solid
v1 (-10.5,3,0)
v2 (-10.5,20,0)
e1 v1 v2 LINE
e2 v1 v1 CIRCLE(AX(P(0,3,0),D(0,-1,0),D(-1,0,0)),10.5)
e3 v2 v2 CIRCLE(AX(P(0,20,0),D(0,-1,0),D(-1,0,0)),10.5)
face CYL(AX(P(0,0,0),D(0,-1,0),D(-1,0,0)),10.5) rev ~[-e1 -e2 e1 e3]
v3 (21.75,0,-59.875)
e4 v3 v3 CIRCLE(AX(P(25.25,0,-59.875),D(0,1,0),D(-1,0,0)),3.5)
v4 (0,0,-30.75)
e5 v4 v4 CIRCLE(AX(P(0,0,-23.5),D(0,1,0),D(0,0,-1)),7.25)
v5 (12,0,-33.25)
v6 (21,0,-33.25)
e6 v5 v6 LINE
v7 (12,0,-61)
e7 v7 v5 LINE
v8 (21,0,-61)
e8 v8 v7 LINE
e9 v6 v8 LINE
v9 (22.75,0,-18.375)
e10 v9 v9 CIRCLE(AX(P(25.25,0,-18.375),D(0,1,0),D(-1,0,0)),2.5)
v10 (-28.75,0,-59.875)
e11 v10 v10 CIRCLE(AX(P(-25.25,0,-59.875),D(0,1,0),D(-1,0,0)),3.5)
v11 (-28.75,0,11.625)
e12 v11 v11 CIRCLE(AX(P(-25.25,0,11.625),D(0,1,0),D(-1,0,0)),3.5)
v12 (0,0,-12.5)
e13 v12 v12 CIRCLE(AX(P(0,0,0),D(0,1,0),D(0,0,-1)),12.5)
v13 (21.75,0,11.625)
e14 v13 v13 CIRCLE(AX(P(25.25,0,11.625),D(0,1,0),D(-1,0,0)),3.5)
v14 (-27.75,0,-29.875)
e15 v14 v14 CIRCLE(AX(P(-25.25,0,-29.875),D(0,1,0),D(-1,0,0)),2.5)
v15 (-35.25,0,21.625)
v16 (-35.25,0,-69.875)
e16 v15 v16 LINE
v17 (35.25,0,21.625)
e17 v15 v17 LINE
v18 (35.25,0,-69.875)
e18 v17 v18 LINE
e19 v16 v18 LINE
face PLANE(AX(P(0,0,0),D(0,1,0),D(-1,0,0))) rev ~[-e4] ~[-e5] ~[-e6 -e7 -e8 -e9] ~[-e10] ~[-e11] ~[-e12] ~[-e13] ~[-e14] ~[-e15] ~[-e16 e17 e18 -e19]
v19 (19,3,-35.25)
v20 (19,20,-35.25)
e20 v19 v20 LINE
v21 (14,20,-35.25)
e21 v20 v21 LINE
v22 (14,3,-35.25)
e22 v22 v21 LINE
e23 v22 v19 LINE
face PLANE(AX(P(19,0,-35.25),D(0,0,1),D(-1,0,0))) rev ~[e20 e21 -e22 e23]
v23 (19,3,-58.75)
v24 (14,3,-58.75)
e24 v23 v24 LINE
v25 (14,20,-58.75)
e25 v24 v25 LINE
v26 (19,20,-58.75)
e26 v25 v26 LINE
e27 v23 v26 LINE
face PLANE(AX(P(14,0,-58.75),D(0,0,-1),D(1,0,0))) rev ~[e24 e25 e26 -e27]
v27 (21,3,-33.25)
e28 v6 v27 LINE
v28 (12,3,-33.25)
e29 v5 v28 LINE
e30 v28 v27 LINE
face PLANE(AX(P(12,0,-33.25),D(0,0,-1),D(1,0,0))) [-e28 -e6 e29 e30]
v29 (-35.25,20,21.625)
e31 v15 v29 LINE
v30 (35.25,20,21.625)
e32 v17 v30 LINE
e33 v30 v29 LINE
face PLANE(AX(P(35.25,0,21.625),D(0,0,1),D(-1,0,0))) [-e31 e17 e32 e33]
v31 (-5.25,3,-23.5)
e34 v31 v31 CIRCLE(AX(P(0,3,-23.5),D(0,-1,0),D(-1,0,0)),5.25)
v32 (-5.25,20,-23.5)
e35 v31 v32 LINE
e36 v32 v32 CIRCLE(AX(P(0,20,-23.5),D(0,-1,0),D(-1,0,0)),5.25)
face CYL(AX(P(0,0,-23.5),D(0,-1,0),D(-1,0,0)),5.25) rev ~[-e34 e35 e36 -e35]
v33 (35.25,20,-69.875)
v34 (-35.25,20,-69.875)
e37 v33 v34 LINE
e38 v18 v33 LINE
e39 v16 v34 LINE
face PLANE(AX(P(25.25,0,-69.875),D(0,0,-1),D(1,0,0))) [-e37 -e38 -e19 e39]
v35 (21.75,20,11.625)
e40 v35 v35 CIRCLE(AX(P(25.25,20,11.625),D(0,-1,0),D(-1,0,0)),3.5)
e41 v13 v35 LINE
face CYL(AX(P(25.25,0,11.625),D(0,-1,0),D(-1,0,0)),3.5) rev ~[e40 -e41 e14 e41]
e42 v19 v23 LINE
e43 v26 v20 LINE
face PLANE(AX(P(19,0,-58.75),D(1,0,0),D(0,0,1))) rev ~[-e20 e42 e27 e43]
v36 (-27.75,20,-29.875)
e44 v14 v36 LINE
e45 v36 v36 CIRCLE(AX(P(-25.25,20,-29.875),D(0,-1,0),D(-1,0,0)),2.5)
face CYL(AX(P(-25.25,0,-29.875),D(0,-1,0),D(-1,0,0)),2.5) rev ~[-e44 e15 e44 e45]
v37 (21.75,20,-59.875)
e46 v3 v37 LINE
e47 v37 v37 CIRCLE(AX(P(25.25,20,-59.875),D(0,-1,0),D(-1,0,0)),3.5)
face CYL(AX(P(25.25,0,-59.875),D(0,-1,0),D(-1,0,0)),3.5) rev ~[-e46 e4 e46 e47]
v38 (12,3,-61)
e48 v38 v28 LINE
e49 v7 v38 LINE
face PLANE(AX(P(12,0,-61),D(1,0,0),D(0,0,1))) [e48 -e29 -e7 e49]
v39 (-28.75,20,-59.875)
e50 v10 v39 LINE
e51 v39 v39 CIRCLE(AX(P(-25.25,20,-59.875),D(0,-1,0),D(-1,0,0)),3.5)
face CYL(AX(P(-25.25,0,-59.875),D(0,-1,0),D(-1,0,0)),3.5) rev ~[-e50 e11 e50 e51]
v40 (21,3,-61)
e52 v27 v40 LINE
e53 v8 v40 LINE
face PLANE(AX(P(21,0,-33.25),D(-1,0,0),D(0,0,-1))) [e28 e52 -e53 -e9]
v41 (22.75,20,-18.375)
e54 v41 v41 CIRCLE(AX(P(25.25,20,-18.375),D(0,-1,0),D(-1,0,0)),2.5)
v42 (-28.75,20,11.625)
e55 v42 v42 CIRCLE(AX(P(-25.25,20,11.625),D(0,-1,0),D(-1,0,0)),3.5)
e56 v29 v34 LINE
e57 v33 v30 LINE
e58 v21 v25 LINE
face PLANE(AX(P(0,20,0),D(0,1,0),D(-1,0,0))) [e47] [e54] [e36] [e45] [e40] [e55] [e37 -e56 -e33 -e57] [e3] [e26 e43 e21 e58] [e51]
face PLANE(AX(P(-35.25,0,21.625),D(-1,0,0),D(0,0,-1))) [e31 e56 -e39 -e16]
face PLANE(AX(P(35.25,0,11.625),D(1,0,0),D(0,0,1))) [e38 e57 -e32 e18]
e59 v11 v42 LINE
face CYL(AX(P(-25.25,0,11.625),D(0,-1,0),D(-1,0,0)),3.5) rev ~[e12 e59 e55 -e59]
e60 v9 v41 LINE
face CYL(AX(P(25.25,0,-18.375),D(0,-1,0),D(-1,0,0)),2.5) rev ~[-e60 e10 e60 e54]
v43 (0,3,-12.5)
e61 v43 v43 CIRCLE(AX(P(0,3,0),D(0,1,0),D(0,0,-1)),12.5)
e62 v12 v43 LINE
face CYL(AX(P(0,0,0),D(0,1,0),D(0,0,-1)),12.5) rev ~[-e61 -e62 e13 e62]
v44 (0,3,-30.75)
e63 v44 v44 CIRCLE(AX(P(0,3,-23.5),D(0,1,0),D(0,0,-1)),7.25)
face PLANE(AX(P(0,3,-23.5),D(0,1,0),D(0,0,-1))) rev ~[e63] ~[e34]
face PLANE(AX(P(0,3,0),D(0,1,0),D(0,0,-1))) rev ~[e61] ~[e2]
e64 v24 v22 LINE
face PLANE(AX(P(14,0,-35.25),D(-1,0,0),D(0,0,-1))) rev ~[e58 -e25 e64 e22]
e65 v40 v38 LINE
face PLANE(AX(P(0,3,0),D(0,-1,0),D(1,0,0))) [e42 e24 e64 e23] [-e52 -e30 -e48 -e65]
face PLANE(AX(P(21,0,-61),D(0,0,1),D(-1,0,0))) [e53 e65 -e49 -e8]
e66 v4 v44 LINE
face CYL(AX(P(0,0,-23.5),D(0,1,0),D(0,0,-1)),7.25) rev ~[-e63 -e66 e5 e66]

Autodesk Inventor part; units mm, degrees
ref_plane "YZ Plane" through (0, 0, 0) normal (1, 0, 0) x (0, 1, 0)
ref_plane "XZ Plane" through (0, 0, 0) normal (0, 1, 0) x (-1, 0, 0)
ref_plane "XY Plane" through (0, 0, 0) normal (0, 0, 1) x (1, 0, 0)
sketch "Sketch1" plane through (0, 0, 0) normal (0, 1, 0) x (-1, 0, 0)
  circle A0 centre (0, 0) radius 10.5
  line L0 (0, 0) -> (0, -23.5)
  circle A1 centre (0, -23.5) radius 5.25
  line L1 (0, -23.5) -> (0, -35.25)
  line L2 (-14, -35.25) -> (-14, -58.75)
  line L3 (-14, -58.75) -> (-19, -58.75)
  line L4 (-19, -58.75) -> (-19, -35.25)
  line L5 (-35.25, 21.625) -> (35.25, 21.625)
  line L6 (-35.25, 21.625) -> (35.25, 21.625) construction
  line L7 (35.25, 21.625) -> (25.25, 21.625)
  line L8 (-35.25, 21.625) -> (35.25, 21.625)
  line L9 (35.25, 21.625) -> (35.25, -69.875)
  line L10 (35.25, -69.875) -> (-35.25, -69.875)
  line L11 (-35.25, -69.875) -> (-35.25, 21.625)
  line L12 (-35.25, 21.625) -> (-35.25, 11.625)
  line L13 (-35.25, 11.625) -> (-25.25, 11.625)
  circle A2 centre (-25.25, 11.625) radius 3.5
  line L14 (35.25, 21.625) -> (25.25, 21.625)
  line L15 (25.25, 21.625) -> (25.25, 11.625)
  circle A3 centre (25.25, 11.625) radius 3.5
  line L16 (35.25, -69.875) -> (25.25, -69.875)
  line L17 (25.25, -69.875) -> (25.25, -59.875)
  circle A4 centre (25.25, -59.875) radius 3.5
  line L18 (-35.25, -69.875) -> (-25.25, -69.875)
  line L19 (-25.25, -69.875) -> (-25.25, -59.875)
  circle A5 centre (-25.25, -59.875) radius 3.5
  line L20 (-25.25, 11.625) -> (-25.25, -18.375)
  line L21 (25.25, -59.875) -> (25.25, -29.875)
  circle A6 centre (-25.25, -18.375) radius 2.5
  circle A7 centre (25.25, -29.875) radius 2.5
  line L22 (-19, -35.25) -> (-14, -35.25)
  dimension "d0" = 21
  dimension "d1" = 23.5
  dimension "d2" = 10.5
  dimension "d3" = 11.75
  dimension "d5" = 23.5
  dimension "d6" = 5
  dimension "d7" = 23.5
  dimension "d9" = 70.5
  dimension "d40" = 21.625
  dimension "d41" = 70.5
  dimension "d42" = 91.5
  dimension "d43" = 10
  dimension "d44" = 10
  dimension "d45" = 7
  dimension "d46" = 10
  dimension "d47" = 10
  dimension "d48" = 90
  dimension "d50" = 7
  dimension "d51" = 10
  dimension "d52" = 10
  dimension "d53" = 7
  dimension "d54" = 10
  dimension "d55" = 10
  dimension "d56" = 7
  dimension "d60" = 30
  dimension "d61" = 30
  dimension "d62" = 5
  dimension "d63" = 5
  dimension "d64" = 14
extrude "Extrusion1" add sketch "Sketch1" along normal blind 20
hole "Hole1" at (0, 0, 0) direction (0, 1, 0) diameter 3 end through all counterbore diameter 25 counterbore depth 3
hole "Hole2" at (0, 0, -23.5) direction (0, 1, 0) diameter 3 end through all counterbore diameter 14.5 counterbore depth 3
sketch "Sketch2" plane through (0, 0, 0) normal (0, -1, 0) x (1, 0, 0)
  line L0 (12, -33.25) -> (21, -33.25)
  line L1 (21, -33.25) -> (21, -61)
  line L2 (21, -61) -> (12, -61)
  line L3 (12, -61) -> (12, -33.25)
  point P0 (0, 0)
  dimension "d85" = 33.25
  dimension "d86" = 12
  dimension "d87" = 9
  dimension "d88" = 27.75
extrude "Extrusion2" cut sketch "Sketch2" against normal blind 3
properties part number "Guia"
